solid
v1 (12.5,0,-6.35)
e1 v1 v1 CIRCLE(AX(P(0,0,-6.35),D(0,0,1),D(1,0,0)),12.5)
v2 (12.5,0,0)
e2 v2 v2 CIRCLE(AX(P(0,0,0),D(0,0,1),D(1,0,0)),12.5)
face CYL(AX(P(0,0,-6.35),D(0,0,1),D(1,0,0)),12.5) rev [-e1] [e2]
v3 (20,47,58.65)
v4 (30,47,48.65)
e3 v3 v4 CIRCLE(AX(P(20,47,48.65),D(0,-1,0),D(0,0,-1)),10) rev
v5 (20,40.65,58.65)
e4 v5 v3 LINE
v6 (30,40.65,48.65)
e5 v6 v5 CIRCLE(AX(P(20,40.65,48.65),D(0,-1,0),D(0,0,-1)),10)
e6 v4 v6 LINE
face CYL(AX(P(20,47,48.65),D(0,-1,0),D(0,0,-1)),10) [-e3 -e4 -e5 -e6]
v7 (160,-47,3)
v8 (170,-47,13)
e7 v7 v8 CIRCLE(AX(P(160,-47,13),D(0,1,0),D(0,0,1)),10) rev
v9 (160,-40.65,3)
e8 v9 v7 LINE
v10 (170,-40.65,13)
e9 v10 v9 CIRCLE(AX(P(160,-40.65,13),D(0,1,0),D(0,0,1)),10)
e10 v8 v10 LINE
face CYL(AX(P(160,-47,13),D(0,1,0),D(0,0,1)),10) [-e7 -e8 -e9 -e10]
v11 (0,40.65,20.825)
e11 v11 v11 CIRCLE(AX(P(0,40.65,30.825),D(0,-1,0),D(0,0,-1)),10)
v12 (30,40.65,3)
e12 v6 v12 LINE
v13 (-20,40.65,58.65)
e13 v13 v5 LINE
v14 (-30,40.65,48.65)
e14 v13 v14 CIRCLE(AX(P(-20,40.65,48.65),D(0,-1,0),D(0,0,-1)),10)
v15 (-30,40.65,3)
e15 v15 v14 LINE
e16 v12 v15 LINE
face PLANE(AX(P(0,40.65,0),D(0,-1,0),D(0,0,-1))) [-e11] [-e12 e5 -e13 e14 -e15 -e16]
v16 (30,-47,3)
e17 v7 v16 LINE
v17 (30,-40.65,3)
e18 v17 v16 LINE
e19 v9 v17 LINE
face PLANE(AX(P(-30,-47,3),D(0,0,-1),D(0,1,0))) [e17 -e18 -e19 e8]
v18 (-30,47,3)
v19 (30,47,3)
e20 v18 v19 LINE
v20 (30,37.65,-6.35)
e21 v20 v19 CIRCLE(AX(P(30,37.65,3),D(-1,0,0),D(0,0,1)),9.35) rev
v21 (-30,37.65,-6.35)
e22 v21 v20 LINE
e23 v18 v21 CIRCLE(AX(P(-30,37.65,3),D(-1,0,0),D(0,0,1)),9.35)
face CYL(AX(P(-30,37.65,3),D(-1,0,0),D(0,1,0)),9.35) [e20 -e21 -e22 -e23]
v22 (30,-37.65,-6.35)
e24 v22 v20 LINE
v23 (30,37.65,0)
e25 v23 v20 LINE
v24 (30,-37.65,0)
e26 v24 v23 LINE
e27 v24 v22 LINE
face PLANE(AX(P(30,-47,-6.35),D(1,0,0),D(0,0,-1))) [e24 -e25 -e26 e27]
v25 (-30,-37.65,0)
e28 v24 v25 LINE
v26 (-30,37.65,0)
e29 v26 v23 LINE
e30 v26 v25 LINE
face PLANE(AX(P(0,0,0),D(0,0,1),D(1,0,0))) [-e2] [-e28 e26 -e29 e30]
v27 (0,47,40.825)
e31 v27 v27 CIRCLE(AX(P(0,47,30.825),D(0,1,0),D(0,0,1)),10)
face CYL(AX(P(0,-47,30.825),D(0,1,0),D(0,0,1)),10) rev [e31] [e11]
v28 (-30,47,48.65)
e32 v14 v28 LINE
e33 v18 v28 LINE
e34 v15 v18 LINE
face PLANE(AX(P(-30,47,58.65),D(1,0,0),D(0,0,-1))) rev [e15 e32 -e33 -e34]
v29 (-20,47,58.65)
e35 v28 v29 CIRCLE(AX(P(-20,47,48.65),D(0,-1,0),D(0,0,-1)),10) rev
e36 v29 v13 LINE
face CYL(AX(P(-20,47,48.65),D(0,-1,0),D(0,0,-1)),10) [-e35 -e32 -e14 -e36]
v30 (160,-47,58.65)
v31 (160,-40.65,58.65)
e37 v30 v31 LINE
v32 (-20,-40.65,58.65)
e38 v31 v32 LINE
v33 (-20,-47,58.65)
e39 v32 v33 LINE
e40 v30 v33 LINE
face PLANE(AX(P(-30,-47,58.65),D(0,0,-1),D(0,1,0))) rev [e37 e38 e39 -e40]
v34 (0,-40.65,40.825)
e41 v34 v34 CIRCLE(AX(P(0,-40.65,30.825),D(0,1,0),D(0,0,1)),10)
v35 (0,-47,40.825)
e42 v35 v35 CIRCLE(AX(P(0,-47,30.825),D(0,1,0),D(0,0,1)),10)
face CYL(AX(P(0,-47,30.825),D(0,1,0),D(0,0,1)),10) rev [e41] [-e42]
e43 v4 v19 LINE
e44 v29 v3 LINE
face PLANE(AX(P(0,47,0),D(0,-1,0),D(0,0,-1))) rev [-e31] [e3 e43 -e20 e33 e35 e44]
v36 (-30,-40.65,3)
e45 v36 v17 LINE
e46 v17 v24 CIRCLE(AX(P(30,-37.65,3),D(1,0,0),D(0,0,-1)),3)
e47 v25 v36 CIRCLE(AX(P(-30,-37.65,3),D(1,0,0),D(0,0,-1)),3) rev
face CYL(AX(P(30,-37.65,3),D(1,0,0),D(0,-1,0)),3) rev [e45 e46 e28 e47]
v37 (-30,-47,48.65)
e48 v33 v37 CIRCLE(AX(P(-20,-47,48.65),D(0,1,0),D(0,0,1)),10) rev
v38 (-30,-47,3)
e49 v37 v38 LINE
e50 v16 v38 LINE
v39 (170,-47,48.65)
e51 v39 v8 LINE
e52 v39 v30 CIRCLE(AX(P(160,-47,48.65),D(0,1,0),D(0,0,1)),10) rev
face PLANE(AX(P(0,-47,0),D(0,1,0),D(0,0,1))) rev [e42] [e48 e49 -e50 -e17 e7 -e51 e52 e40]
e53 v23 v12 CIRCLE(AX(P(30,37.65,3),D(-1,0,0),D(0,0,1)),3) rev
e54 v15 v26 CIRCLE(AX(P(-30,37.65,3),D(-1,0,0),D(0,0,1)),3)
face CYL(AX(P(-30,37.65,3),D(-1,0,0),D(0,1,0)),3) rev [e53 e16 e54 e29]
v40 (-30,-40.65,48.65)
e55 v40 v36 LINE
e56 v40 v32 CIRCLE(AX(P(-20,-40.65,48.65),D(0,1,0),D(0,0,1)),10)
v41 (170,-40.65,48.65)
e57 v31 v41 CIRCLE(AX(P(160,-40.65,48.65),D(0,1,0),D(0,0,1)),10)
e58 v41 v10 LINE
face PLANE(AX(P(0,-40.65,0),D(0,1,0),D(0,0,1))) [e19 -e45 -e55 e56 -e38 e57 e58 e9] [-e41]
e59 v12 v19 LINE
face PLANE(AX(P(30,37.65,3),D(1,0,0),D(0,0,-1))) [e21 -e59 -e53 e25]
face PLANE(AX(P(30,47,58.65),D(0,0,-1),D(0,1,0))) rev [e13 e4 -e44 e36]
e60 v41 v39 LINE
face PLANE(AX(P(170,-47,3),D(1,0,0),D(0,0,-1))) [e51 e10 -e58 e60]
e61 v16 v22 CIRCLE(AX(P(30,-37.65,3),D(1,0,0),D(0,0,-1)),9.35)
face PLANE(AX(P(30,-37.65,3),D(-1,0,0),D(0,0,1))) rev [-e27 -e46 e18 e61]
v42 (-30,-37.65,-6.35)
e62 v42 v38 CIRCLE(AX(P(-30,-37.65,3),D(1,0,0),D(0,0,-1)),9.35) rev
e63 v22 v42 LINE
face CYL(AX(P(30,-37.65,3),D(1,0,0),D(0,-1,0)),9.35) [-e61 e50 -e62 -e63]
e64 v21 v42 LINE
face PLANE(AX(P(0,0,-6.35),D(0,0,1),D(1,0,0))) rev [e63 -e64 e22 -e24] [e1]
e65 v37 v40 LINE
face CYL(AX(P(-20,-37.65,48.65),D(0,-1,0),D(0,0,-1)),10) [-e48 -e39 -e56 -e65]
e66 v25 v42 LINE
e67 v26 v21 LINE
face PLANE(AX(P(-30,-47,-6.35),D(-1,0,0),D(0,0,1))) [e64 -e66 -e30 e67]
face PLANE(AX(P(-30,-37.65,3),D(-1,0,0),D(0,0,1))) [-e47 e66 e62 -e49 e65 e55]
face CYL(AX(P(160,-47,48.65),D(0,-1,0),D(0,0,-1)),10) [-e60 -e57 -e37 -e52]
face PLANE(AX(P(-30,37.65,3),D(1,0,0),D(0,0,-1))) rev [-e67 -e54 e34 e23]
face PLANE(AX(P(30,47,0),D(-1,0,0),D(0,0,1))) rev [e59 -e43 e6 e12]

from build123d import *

# Parameters (mm, degrees)
SKETCH1_W                      = 60
SKETCH1_H                      = 94
BASE_FLANGE1_DEPTH             = 6.35
EDGE_FLANGE1_STRIP_W           = 31.4
EDGE_FLANGE1_STRIP_H           = 6.35
EDGE_FLANGE1_STRIP_CUT_DEPTH   = 60
EDGE_FLANGE1_STRIP_2_W         = 31.4
EDGE_FLANGE1_STRIP_2_H         = 6.35
EDGE_FLANGE1_STRIP_CUT_2_DEPTH = 60
EDGE_FLANGE1_DEPTH             = 60
EDGE_FLANGE1_BEND_DEPTH        = 60
SKETCH12_W                     = 200
SKETCH12_H                     = 55.65
TAB1_DEPTH                     = 6.35
FILLET2_R                      = 10
SKETCH14_R                     = 12.5
CUT_EXTRUDE1_DEPTH             = 186.873135498
SKETCH15_R                     = 10
CUT_EXTRUDE2_DEPTH             = 203.918265565


# Sheet-metal steps are written as plain solids
with BuildPart() as part:
    # Sketch1 → Base-Flange1 (new body)
    with BuildSketch(Plane.XY):
        Rectangle(SKETCH1_W, SKETCH1_H)
    extrude(amount=-BASE_FLANGE1_DEPTH)

    # Edge-Flange1 strip (across the edge) → Edge-Flange1 strip cut (cut)
    with BuildSketch(Plane(origin=(30, 47, 0), x_dir=(0, -1, 0), z_dir=(-1, 0, 0))):
        with Locations((-6.35, -3.175)):
            Rectangle(EDGE_FLANGE1_STRIP_W, EDGE_FLANGE1_STRIP_H)
    extrude(amount=EDGE_FLANGE1_STRIP_CUT_DEPTH, mode=Mode.SUBTRACT)

    # Edge-Flange1 strip 2 (across the edge) → Edge-Flange1 strip cut 2 (cut)
    with BuildSketch(Plane(origin=(-30, -47, 0), x_dir=(0, 1, 0), z_dir=(1, 0, 0))):
        with Locations((-6.35, -3.175)):
            Rectangle(EDGE_FLANGE1_STRIP_2_W, EDGE_FLANGE1_STRIP_2_H)
    extrude(amount=EDGE_FLANGE1_STRIP_CUT_2_DEPTH, mode=Mode.SUBTRACT)

    # Edge-Flange1 section (across the edge) → Edge-Flange1 (add)
    with BuildSketch(Plane(origin=(30, 47, 0), x_dir=(0, -1, 0), z_dir=(-1, 0, 0))):
        with BuildLine():
            Line((0, 3), (0, 58.65))
            Line((0, 58.65), (6.35, 58.65))
            Line((6.35, 58.65), (6.35, 3))
            ThreePointArc((6.35, 3), (7.228679656, 0.878679656), (9.35, 0))
            Line((9.35, 0), (9.35, -6.35))
            ThreePointArc((9.35, -6.35), (2.738551596, -3.611448404), (0, 3))
        make_face()
    extrude(amount=EDGE_FLANGE1_DEPTH)

    # Edge-Flange1 section 2 (across the edge) → Edge-Flange1 bend (add)
    with BuildSketch(Plane(origin=(-30, -47, 0), x_dir=(0, 1, 0), z_dir=(1, 0, 0))):
        with BuildLine():
            Line((0, 3), (0, 58.65))
            Line((0, 58.65), (6.35, 58.65))
            Line((6.35, 58.65), (6.35, 3))
            ThreePointArc((6.35, 3), (7.228679656, 0.878679656), (9.35, 0))
            Line((9.35, 0), (9.35, -6.35))
            ThreePointArc((9.35, -6.35), (2.738551596, -3.611448404), (0, 3))
        make_face()
    extrude(amount=EDGE_FLANGE1_BEND_DEPTH)

    # Sketch12 → Tab1 (add)
    with BuildSketch(Plane(origin=(0, -40.65, 0), x_dir=(1, 0, 0), z_dir=(0, 1, 0))):
        with Locations((70, -30.825)):
            Rectangle(SKETCH12_W, SKETCH12_H)
    extrude(amount=-TAB1_DEPTH)

    # Fillet2
    fillet2_edges = [part.edges().sort_by_distance(p)[0] for p in [
        (30, 43.825, 58.65),
        (-30, 43.825, 58.65),
        (-30, -43.825, 58.65),
        (170, -43.825, 58.65),
        (170, -43.825, 3),
    ]]
    fillet(fillet2_edges, radius=FILLET2_R)

    # Sketch14 → Cut-Extrude1 (cut, through all)
    with BuildSketch(Plane.XY):
        Circle(SKETCH14_R)
    extrude(amount=-CUT_EXTRUDE1_DEPTH, mode=Mode.SUBTRACT)

    # Sketch15 → Cut-Extrude2 (cut, through all)
    with BuildSketch(Plane(origin=(0, 47, 0), x_dir=(1, 0, 0), z_dir=(0, 1, 0))):
        with Locations(Location((0, -30.825, 0), (0, 0, 270))):
            Circle(SKETCH15_R)
    extrude(amount=-CUT_EXTRUDE2_DEPTH, mode=Mode.SUBTRACT)


solid = part.part
